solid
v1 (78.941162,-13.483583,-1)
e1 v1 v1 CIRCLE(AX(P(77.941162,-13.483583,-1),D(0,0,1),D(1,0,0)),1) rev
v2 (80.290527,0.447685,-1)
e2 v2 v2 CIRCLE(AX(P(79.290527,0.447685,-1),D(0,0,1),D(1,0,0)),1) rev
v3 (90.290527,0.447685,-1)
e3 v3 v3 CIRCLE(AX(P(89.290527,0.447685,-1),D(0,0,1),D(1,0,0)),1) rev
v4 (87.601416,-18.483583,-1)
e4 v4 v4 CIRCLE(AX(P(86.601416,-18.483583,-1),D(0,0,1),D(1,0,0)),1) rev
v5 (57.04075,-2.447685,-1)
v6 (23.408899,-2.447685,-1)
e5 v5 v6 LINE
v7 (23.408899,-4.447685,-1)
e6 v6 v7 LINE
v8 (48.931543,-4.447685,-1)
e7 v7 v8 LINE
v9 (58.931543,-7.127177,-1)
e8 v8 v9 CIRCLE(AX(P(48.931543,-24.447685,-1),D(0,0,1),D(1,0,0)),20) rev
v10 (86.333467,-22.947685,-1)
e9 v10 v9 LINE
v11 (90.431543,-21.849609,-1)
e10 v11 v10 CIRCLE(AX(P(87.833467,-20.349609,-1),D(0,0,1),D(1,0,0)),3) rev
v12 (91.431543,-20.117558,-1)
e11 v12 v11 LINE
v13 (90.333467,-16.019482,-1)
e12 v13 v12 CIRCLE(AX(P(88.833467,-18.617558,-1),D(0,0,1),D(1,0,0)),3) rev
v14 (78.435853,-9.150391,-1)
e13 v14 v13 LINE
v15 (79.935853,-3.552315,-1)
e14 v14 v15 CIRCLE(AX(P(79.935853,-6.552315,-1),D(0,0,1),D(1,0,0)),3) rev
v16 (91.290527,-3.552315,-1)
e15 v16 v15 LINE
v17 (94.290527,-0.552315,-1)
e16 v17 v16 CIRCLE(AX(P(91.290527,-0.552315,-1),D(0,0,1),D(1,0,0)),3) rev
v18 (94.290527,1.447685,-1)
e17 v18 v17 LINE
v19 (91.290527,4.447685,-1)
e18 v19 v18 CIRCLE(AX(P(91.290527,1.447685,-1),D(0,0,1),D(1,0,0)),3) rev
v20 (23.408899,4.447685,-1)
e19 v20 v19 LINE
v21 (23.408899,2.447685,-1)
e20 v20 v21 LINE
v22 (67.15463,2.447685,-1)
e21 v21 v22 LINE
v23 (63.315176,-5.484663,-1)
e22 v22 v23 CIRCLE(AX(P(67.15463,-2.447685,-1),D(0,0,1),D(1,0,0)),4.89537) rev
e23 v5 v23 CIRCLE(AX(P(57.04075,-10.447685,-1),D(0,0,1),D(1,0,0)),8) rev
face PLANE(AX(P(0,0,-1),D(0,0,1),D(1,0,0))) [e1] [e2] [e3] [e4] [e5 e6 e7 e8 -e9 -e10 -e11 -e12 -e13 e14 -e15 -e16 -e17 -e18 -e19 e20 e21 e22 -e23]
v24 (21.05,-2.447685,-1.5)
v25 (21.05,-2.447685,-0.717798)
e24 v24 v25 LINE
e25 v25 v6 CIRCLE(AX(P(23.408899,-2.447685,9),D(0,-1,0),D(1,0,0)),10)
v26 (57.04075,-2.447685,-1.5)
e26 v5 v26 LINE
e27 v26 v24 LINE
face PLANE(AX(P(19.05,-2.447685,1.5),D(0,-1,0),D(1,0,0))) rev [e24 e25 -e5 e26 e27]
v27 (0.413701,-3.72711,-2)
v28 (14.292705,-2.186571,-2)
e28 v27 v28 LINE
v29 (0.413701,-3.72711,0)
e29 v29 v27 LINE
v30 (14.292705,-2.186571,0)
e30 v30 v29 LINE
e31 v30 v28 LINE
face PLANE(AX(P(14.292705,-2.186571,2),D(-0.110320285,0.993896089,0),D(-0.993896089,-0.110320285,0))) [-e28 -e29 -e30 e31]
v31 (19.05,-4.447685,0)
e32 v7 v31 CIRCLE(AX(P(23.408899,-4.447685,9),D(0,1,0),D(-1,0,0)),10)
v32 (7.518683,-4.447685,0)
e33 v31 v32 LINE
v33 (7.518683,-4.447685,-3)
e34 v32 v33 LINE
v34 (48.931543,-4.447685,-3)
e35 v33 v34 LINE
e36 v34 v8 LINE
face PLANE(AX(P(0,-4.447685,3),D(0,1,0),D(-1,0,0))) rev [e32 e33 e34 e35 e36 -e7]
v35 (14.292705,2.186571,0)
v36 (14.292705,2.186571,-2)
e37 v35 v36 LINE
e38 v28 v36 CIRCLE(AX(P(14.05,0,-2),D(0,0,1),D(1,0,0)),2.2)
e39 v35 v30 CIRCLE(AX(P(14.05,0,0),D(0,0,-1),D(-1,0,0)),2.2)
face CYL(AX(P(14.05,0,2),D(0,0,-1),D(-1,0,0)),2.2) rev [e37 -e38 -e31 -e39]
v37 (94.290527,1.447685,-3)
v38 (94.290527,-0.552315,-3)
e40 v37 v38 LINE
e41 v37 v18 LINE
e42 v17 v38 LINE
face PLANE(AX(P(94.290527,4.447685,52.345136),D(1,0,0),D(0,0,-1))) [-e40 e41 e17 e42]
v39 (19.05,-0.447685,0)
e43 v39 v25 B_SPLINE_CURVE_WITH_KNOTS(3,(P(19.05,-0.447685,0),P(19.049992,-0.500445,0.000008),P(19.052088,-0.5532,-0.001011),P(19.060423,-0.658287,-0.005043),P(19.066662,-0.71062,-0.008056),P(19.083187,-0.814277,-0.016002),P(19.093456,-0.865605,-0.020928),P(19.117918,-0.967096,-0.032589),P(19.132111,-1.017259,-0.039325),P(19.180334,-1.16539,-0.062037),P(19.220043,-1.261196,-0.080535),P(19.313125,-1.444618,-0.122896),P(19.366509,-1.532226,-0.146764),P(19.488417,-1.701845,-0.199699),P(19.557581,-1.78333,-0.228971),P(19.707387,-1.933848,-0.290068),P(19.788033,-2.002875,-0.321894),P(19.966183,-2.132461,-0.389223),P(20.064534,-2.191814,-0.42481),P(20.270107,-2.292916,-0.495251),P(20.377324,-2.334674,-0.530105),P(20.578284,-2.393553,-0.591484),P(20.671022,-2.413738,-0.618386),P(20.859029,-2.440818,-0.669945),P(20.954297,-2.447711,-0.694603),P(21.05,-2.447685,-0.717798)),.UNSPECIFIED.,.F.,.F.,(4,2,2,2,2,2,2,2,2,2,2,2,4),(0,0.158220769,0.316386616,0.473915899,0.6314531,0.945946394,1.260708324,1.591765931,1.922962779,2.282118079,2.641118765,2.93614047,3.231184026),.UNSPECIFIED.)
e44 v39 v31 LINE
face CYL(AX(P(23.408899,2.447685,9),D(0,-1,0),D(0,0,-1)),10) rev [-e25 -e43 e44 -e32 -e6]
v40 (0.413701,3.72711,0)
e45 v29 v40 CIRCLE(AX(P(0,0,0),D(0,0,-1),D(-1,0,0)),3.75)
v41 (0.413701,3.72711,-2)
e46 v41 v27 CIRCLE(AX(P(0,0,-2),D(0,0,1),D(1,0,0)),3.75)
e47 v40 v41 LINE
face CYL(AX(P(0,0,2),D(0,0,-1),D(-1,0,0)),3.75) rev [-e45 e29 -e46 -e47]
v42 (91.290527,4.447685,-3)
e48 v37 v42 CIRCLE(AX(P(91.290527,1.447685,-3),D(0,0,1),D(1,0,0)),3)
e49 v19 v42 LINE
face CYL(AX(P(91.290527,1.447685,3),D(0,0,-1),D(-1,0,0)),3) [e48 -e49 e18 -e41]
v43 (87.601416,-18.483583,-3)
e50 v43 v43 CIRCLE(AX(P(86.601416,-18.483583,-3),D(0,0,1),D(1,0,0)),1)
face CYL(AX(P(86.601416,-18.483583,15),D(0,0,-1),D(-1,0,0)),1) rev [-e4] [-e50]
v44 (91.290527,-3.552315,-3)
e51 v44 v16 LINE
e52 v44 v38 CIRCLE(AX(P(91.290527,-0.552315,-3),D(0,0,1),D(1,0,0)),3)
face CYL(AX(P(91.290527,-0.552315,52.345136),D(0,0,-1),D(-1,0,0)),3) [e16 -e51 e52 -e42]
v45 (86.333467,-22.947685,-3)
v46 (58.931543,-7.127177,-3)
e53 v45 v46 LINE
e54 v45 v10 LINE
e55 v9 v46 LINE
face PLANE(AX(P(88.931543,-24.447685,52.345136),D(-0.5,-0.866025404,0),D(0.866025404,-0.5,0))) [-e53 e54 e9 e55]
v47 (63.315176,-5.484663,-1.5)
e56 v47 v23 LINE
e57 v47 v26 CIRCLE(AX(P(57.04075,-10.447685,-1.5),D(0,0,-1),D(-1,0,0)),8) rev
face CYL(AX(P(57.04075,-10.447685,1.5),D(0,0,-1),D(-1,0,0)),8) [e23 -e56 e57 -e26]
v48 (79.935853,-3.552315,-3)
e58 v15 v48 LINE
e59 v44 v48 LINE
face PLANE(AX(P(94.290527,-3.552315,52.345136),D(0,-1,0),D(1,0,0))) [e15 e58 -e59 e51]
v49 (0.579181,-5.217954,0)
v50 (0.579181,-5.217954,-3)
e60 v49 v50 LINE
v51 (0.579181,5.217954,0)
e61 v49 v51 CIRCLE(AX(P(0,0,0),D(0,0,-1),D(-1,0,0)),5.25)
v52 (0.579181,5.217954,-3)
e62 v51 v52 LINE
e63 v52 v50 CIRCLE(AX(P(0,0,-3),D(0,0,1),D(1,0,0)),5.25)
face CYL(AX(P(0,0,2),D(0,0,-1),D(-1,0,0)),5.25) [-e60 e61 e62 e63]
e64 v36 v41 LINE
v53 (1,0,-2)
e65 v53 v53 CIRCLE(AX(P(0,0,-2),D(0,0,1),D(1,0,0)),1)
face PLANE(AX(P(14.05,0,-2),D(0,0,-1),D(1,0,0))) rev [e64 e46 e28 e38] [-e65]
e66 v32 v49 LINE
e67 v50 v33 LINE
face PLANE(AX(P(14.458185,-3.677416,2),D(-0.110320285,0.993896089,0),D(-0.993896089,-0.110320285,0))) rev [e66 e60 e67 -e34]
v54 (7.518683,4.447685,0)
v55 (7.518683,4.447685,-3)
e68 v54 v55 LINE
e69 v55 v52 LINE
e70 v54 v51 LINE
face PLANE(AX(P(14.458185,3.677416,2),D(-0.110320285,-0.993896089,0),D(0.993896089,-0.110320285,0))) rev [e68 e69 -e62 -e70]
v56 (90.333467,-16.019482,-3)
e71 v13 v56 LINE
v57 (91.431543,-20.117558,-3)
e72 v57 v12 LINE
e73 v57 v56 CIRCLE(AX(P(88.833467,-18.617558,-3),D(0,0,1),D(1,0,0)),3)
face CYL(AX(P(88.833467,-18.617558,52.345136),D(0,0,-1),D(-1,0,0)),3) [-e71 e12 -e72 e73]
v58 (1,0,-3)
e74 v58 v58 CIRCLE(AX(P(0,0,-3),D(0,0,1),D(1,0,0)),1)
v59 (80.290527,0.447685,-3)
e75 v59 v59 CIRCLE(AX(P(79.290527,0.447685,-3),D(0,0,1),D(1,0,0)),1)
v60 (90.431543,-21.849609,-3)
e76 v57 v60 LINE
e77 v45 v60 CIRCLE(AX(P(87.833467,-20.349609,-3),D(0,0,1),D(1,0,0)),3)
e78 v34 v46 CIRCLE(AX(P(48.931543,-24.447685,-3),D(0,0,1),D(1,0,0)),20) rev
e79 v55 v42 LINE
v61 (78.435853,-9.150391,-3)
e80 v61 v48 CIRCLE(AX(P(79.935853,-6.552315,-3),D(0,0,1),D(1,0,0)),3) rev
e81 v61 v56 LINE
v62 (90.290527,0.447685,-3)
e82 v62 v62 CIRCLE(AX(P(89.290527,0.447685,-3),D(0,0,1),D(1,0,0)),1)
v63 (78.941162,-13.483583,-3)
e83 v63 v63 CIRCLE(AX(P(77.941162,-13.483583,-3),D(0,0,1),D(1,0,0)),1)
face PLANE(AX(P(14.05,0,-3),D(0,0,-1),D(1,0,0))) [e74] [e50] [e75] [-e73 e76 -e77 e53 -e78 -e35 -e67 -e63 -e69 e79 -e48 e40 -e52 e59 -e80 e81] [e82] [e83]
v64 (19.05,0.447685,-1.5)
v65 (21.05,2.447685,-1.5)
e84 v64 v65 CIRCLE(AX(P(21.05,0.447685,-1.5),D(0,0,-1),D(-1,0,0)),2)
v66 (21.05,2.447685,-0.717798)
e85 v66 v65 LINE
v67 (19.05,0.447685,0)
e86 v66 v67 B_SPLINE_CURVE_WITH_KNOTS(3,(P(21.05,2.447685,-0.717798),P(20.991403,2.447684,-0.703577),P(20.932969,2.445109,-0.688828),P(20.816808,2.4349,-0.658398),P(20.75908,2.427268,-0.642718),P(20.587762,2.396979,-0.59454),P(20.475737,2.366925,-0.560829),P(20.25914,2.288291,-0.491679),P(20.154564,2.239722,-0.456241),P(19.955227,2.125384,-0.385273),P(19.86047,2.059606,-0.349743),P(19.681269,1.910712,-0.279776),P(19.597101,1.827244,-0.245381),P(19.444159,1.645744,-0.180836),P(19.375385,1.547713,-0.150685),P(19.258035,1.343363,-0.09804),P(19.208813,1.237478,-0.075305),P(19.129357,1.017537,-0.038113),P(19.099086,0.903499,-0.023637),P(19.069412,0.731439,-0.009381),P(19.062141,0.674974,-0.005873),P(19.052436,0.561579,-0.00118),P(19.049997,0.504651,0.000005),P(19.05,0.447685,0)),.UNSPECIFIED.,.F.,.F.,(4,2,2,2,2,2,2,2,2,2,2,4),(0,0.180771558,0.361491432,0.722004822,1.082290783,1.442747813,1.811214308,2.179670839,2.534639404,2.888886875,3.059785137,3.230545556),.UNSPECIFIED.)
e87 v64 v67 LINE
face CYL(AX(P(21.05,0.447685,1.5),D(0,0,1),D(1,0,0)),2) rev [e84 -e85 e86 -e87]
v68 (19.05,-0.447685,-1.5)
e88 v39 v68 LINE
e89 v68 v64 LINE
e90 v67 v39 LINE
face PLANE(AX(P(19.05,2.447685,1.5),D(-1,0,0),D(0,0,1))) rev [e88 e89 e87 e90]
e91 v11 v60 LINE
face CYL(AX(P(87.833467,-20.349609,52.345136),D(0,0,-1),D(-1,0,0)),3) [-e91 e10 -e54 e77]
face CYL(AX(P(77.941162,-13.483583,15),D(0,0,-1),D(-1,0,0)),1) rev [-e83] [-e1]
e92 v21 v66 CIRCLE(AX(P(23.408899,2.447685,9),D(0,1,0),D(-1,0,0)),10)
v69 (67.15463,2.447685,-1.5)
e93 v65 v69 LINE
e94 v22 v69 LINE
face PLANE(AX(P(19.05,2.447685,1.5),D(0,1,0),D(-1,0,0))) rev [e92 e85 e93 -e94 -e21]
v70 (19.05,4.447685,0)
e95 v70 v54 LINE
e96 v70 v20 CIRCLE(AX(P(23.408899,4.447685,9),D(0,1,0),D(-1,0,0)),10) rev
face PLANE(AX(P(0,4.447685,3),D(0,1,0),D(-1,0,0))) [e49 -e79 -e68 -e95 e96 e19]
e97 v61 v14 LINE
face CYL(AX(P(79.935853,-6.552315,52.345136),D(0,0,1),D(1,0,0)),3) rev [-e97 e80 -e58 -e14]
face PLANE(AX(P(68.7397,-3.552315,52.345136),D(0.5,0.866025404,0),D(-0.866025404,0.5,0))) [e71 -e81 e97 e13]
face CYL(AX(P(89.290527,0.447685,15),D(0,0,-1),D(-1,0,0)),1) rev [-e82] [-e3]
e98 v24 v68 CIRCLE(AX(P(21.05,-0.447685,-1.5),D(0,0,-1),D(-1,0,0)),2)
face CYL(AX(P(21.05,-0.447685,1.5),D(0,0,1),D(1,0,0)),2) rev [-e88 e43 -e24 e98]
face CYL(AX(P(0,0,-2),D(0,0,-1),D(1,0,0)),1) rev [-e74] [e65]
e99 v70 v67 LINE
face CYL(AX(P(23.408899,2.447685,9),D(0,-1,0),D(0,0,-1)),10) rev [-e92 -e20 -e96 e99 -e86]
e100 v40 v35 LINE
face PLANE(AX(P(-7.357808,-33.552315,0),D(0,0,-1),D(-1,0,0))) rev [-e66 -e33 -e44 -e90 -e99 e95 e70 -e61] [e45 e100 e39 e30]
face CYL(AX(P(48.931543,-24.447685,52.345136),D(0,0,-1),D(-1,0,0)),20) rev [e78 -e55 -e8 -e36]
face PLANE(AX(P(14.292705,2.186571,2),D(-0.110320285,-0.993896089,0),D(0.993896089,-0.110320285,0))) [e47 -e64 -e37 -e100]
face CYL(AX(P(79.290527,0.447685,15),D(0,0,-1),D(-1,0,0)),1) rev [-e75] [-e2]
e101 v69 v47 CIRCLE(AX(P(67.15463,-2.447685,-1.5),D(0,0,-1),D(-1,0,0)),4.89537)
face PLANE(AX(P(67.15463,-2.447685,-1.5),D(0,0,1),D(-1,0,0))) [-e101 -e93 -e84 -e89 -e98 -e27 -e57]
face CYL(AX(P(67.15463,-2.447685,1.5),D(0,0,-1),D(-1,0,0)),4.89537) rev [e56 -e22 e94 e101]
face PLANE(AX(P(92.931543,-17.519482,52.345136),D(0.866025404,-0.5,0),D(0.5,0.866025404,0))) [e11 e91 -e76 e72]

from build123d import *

# Parameters (mm, degrees)
BOSS_EXTRUDE1_DEPTH      = 2
BOSS_EXTRUDE2_DEPTH      = 1
SKETCH3_R                = 1
CUT_EXTRUDE1_DEPTH       = 1
BOSS_EXTRUDE3_DEPTH      = 2
BOSS_EXTRUDE3_DEPTH_BACK = 1
BOSS_EXTRUDE4_START      = -3
BOSS_EXTRUDE4_OUTLINE_R  = 1
BOSS_EXTRUDE4_DEPTH      = 3
SKETCH6_R                = 3.500627768
BOSS_EXTRUDE5_DEPTH      = 3
BOSS_EXTRUDE6_DEPTH      = 3
CUT_EXTRUDE2_DEPTH       = 15
FILLET1_R                = 20
FILLET2_R                = 3
FILLET3_R                = 3
SKETCH9_R                = 1
CUT_EXTRUDE3_DEPTH       = 15
CUT_EXTRUDE4_DEPTH       = 1.5
FILLET4_R                = 8
FILLET5_R                = 2
SKETCH11_W               = 110.258684369
SKETCH11_H               = 6.064888907
CUT_EXTRUDE5_DEPTH       = 38
SKETCH12_R               = 18.613151801
CUT_EXTRUDE6_DEPTH       = 29
SKETCH13_W               = 77.706478895
SKETCH13_H               = 41.021519778
CUT_EXTRUDE7_DEPTH       = 1
FILLET6_START            = -4.447684996
FILLET6_DEPTH            = 2
FILLET6_START_2          = 2.447684996
FILLET6_2_DEPTH          = 2
FILLET6_START_3          = -1
FILLET6_3_DEPTH          = 1
FILLET6_START_4          = -2.447684996
FILLET6_4_DEPTH          = 4.895369992


with BuildPart() as part:
    # Sketch1 → Boss-Extrude1 (new body)
    with BuildSketch(Plane.XY):
        with BuildLine():
            Line((14.458185053, 3.677415528), (0.579181495, 5.217954465))
            ThreePointArc((0.579181495, 5.217954465), (-5.25, 0), (0.579181495, -5.217954465))
            Line((0.579181495, -5.217954465), (14.458185053, -3.677415528))
            ThreePointArc((14.458185053, -3.677415528), (17.75, 0), (14.458185053, 3.677415528))
        make_face()
        with BuildLine():
            Line((14.292704626, 2.186571395), (0.413701068, 3.727110332))
            ThreePointArc((0.413701068, 3.727110332), (-3.75, 0), (0.413701068, -3.727110332))
            Line((0.413701068, -3.727110332), (14.292704626, -2.186571395))
            ThreePointArc((14.292704626, -2.186571395), (16.25, 0), (14.292704626, 2.186571395))
        make_face(mode=Mode.SUBTRACT)
    extrude(amount=BOSS_EXTRUDE1_DEPTH)

    # Sketch2 → Boss-Extrude2 (add)
    with BuildSketch(Plane.XY.offset(2)):
        with BuildLine():
            Line((14.458185053, 3.677415528), (0.579181495, 5.217954465))
            ThreePointArc((0.579181495, 5.217954465), (-5.25, 0), (0.579181495, -5.217954465))
            Line((0.579181495, -5.217954465), (14.458185053, -3.677415528))
            ThreePointArc((14.458185053, -3.677415528), (17.75, 0), (14.458185053, 3.677415528))
        make_face()
    extrude(amount=BOSS_EXTRUDE2_DEPTH)

    # Sketch3 → Cut-Extrude1 (cut)
    with BuildSketch(Plane.XY.offset(3)):
        Circle(SKETCH3_R)
    extrude(amount=-CUT_EXTRUDE1_DEPTH, mode=Mode.SUBTRACT)

    # Sketch4 → Boss-Extrude3 (add, two sides: drawn at the far end of the back side and taken through both)
    with BuildSketch(Plane(origin=(0, 0, 2), x_dir=(-1, 0, 0), z_dir=(0, 0, -1)).offset(-BOSS_EXTRUDE3_DEPTH_BACK)):
        with BuildLine():
            Line((-15.26072202, 2.426182253), (-7.518683274, 4.447684996))
            Line((-7.518683274, 4.447684996), (-42.518683274, 4.447684996))
            ThreePointArc((-42.518683274, 4.447684996), (-39.373695053, 3.144988221), (-38.070998278, 0))
            ThreePointArc((-38.070998278, 0), (-39.373695053, -3.144988221), (-42.518683274, -4.447684996))
            Line((-42.518683274, -4.447684996), (-7.518683274, -4.447684996))
            Line((-7.518683274, -4.447684996), (-13.862339481, -2.595687971))
            Line((-13.862339481, -2.595687971), (-16.213670101, -1.84565397))
            Line((-16.213670101, -1.84565397), (-17.166618181, 0))
            Line((-17.166618181, 0), (-15.26072202, 2.426182253))
        make_face()
        with BuildLine():
            ThreePointArc((-38.070998278, 0), (-39.373695053, 3.144988221), (-42.518683274, 4.447684996))
            Line((-42.518683274, 4.447684996), (-42.518683274, 2))
            ThreePointArc((-42.518683274, 2), (-41.104469712, 1.414213562), (-40.518683274, 0))
            ThreePointArc((-40.518683274, 0), (-41.104469712, -1.414213562), (-42.518683274, -2))
            Line((-42.518683274, -2), (-42.518683274, -4.447684996))
            ThreePointArc((-42.518683274, -4.447684996), (-39.373695053, -3.144988221), (-38.070998278, 0))
        make_face()
        with BuildLine():
            Line((-42.518683274, 2), (-42.518683274, 4.447684996))
            ThreePointArc((-42.518683274, 4.447684996), (-46.96636827, 0), (-42.518683274, -4.447684996))
            Line((-42.518683274, -4.447684996), (-42.518683274, -2))
            ThreePointArc((-42.518683274, -2), (-44.518683274, 0), (-42.518683274, 2))
        make_face()
    extrude(amount=BOSS_EXTRUDE3_DEPTH + BOSS_EXTRUDE3_DEPTH_BACK)

    # Boss-Extrude4: read off the stored shape, not the designer's step
    # Boss-Extrude4 outline → Boss-Extrude4 (add)
    with BuildSketch(Plane(origin=(0, 0, 0), x_dir=(-1, 0, 0), z_dir=(0, 0, -1)).offset(BOSS_EXTRUDE4_START)):
        with BuildLine():
            ThreePointArc((-42.518683274, -4.447684996), (-46.96636827, 0), (-42.518683274, 4.447684996))
            Line((-42.518683274, 4.447684996), (-54.290526798, 4.447684996))
            ThreePointArc((-54.290526798, 4.447684996), (-59.289068337, 5.305033813), (-63.716210719, 7.779073998))
            ThreePointArc((-63.716210719, 7.779073998), (-80, 0), (-63.716210719, -7.779073998))
            ThreePointArc((-63.716210719, -7.779073998), (-59.289068337, -5.305033813), (-54.290526798, -4.447684996))
            Line((-54.290526798, -4.447684996), (-42.518683274, -4.447684996))
        make_face()
        with Locations((-68.205771366, -4.5)):
            Circle(BOSS_EXTRUDE4_OUTLINE_R, mode=Mode.SUBTRACT)
        with Locations((-76, 0)):
            Circle(BOSS_EXTRUDE4_OUTLINE_R, mode=Mode.SUBTRACT)
        with Locations((-68.205771366, 4.5)):
            Circle(BOSS_EXTRUDE4_OUTLINE_R, mode=Mode.SUBTRACT)
    extrude(amount=BOSS_EXTRUDE4_DEPTH)

    # Sketch6 → Boss-Extrude5 (add)
    with BuildSketch(Plane(origin=(0, 0, 0), x_dir=(-1, 0, 0), z_dir=(0, 0, -1))):
        with Locations((-42.518683274, 0)):
            Circle(SKETCH6_R)
    extrude(amount=-BOSS_EXTRUDE5_DEPTH)

    # Sketch7 → Boss-Extrude6 (add)
    with BuildSketch(Plane(origin=(0, 0, 0), x_dir=(-1, 0, 0), z_dir=(0, 0, -1))):
        Polygon((-54.290526798, 4.447684996), (-94.290526798, 4.447684996), (-94.290526798, -3.552315004), (-68.73970048, -3.552315004), (-92.931542949, -17.519481766), (-88.931542949, -24.447684996), (-54.290526798, -4.447684996), align=None)
    extrude(amount=-BOSS_EXTRUDE6_DEPTH)

    # Sketch8 → Cut-Extrude2 (cut)
    with BuildSketch(Plane(origin=(0, 0, 0), x_dir=(-1, 0, 0), z_dir=(0, 0, -1))):
        Polygon((-94.290526798, 4.447684996), (-45.837456427, 4.447684996), (-68.326886593, 15.265325323), align=None)
        Polygon((-94.290526798, -3.552315004), (-68.73970048, -3.552315004), (-92.931542949, -17.519481766), align=None)
    extrude(amount=-CUT_EXTRUDE2_DEPTH, mode=Mode.SUBTRACT)

    # Fillet1
    fillet1_edges = [part.edges().sort_by_distance(p)[0] for p in [
        (54.290526798, -4.447684996, 1.5),
    ]]
    fillet(fillet1_edges, radius=FILLET1_R)

    # Fillet2
    fillet2_edges = [part.edges().sort_by_distance(p)[0] for p in [
        (94.290526798, 4.447684996, 1.5),
        (94.290526798, -3.552315004, 1.5),
        (92.931542949, -17.519481766, 1.5),
        (88.931542949, -24.447684996, 1.5),
    ]]
    fillet(fillet2_edges, radius=FILLET2_R)

    # Fillet3
    fillet3_edges = [part.edges().sort_by_distance(p)[0] for p in [
        (68.73970048, -3.552315004, 1.5),
    ]]
    fillet(fillet3_edges, radius=FILLET3_R)

    # Sketch9 → Cut-Extrude3 (cut)
    with BuildSketch(Plane(origin=(0, 0, 0), x_dir=(-1, 0, 0), z_dir=(0, 0, -1))):
        with Locations((-89.290526798, 0.447684996)):
            Circle(SKETCH9_R)
        with Locations((-79.290526798, 0.447684996)):
            Circle(SKETCH9_R)
        with Locations((-77.941161892, -13.483583381)):
            Circle(SKETCH9_R)
        with Locations((-86.60141593, -18.483583381)):
            Circle(SKETCH9_R)
    extrude(amount=-CUT_EXTRUDE3_DEPTH, mode=Mode.SUBTRACT)

    # Sketch10 → Cut-Extrude4 (cut)
    with BuildSketch(Plane(origin=(0, 0, 0), x_dir=(-1, 0, 0), z_dir=(0, 0, -1))):
        with BuildLine():
            Line((-19.05, 2.447684996), (-67.154630008, 2.447684996))
            ThreePointArc((-67.154630008, 2.447684996), (-70.616179326, -5.909234314), (-62.259260015, -2.447684996))
            Line((-62.259260015, -2.447684996), (-19.05, -2.447684996))
            Line((-19.05, -2.447684996), (-19.05, 2.447684996))
        make_face()
    extrude(amount=-CUT_EXTRUDE4_DEPTH, mode=Mode.SUBTRACT)

    # Fillet4
    fillet4_edges = [part.edges().sort_by_distance(p)[0] for p in [
        (62.259260015, -2.447684996, 0.75),
    ]]
    fillet(fillet4_edges, radius=FILLET4_R)

    # Fillet5
    fillet5_edges = [part.edges().sort_by_distance(p)[0] for p in [
        (19.05, 2.447684996, 0.75),
        (19.05, -2.447684996, 0.75),
    ]]
    fillet(fillet5_edges, radius=FILLET5_R)

    # Mirror1: part across plane


with BuildPart() as part_1:
    add(part.part)
    add(part.part.mirror(Plane(origin=(14.05, 0, 0), x_dir=(1, 0, 0), z_dir=(0, 0, 1))))

    # Sketch11 → Cut-Extrude5 (cut)
    with BuildSketch(Plane(origin=(0, 4.447684996, 0), x_dir=(1, 0, 0), z_dir=(0, 1, 0))):
        with Locations((47.771534573, -3.032444454)):
            Rectangle(SKETCH11_W, SKETCH11_H)
    extrude(amount=-CUT_EXTRUDE5_DEPTH, mode=Mode.SUBTRACT)

    # Sketch12 → Cut-Extrude6 (cut)
    with BuildSketch(Plane.XY):
        with Locations((7.534351793, 3.599902348)):
            Circle(SKETCH12_R)
    extrude(amount=CUT_EXTRUDE6_DEPTH, mode=Mode.SUBTRACT)

    # Sketch13 → Cut-Extrude7 (cut)
    with BuildSketch(Plane.XY):
        with Locations((57.903239447, -8.718962854)):
            Rectangle(SKETCH13_W, SKETCH13_H)
    extrude(amount=-CUT_EXTRUDE7_DEPTH, mode=Mode.SUBTRACT)

    # Fillet6: read off the stored shape, not the designer's step
    # Fillet6 outline → Fillet6 (add)
    with BuildSketch(Plane(origin=(0, 0, 0), x_dir=(1, 0, 0), z_dir=(0, 1, 0)).offset(FILLET6_START)):
        with BuildLine():
            Line((19.05, 1), (19.049997006, -1.45e-06))
            ThreePointArc((19.049997006, -1.45e-06), (21.172829345, 0.746793973), (23.408898944, 1))
            Line((23.408898944, 1), (19.05, 1))
        make_face()
    extrude(amount=FILLET6_DEPTH)

    # Fillet6 2 outline → Fillet6 2 (add)
    with BuildSketch(Plane(origin=(0, 0, 0), x_dir=(1, 0, 0), z_dir=(0, 1, 0)).offset(FILLET6_START_2)):
        with BuildLine():
            Line((19.05, 1), (19.049997006, -1.45e-06))
            ThreePointArc((19.049997006, -1.45e-06), (21.172829345, 0.746793973), (23.408898944, 1))
            Line((23.408898944, 1), (19.05, 1))
        make_face()
    extrude(amount=FILLET6_2_DEPTH)

    # Fillet6 3 outline → Fillet6 3 (add)
    with BuildSketch(Plane.XY.offset(FILLET6_START_3)):
        with BuildLine():
            Line((19.05, 2.447684996), (19.05, 0.447684996))
            ThreePointArc((19.05, 0.447684996), (19.635786438, 1.861898559), (21.05, 2.447684996))
            Line((21.05, 2.447684996), (19.05, 2.447684996))
        make_face()
        with BuildLine():
            ThreePointArc((21.05, -2.447684996), (19.635786438, -1.861898559), (19.05, -0.447684996))
            Line((19.05, -0.447684996), (19.05, -2.447684996))
            Line((19.05, -2.447684996), (21.05, -2.447684996))
        make_face()
    extrude(amount=FILLET6_3_DEPTH)

    # Fillet6 4 outline → Fillet6 4 (cut)
    with BuildSketch(Plane(origin=(0, 0, 0), x_dir=(1, 0, 0), z_dir=(0, 1, 0)).offset(FILLET6_START_4)):
        with BuildLine():
            ThreePointArc((23, 0.991636585), (20.973982557, 0.699029961), (19.049997006, -1.45e-06))
            Line((19.049997006, -1.45e-06), (18, -0.508538641))
            Line((18, -0.508538641), (18, -1))
            Line((18, -1), (23, -1))
            Line((23, -1), (23, 0.991636585))
        make_face()
    extrude(amount=FILLET6_4_DEPTH, mode=Mode.SUBTRACT)


solid = part_1.part
